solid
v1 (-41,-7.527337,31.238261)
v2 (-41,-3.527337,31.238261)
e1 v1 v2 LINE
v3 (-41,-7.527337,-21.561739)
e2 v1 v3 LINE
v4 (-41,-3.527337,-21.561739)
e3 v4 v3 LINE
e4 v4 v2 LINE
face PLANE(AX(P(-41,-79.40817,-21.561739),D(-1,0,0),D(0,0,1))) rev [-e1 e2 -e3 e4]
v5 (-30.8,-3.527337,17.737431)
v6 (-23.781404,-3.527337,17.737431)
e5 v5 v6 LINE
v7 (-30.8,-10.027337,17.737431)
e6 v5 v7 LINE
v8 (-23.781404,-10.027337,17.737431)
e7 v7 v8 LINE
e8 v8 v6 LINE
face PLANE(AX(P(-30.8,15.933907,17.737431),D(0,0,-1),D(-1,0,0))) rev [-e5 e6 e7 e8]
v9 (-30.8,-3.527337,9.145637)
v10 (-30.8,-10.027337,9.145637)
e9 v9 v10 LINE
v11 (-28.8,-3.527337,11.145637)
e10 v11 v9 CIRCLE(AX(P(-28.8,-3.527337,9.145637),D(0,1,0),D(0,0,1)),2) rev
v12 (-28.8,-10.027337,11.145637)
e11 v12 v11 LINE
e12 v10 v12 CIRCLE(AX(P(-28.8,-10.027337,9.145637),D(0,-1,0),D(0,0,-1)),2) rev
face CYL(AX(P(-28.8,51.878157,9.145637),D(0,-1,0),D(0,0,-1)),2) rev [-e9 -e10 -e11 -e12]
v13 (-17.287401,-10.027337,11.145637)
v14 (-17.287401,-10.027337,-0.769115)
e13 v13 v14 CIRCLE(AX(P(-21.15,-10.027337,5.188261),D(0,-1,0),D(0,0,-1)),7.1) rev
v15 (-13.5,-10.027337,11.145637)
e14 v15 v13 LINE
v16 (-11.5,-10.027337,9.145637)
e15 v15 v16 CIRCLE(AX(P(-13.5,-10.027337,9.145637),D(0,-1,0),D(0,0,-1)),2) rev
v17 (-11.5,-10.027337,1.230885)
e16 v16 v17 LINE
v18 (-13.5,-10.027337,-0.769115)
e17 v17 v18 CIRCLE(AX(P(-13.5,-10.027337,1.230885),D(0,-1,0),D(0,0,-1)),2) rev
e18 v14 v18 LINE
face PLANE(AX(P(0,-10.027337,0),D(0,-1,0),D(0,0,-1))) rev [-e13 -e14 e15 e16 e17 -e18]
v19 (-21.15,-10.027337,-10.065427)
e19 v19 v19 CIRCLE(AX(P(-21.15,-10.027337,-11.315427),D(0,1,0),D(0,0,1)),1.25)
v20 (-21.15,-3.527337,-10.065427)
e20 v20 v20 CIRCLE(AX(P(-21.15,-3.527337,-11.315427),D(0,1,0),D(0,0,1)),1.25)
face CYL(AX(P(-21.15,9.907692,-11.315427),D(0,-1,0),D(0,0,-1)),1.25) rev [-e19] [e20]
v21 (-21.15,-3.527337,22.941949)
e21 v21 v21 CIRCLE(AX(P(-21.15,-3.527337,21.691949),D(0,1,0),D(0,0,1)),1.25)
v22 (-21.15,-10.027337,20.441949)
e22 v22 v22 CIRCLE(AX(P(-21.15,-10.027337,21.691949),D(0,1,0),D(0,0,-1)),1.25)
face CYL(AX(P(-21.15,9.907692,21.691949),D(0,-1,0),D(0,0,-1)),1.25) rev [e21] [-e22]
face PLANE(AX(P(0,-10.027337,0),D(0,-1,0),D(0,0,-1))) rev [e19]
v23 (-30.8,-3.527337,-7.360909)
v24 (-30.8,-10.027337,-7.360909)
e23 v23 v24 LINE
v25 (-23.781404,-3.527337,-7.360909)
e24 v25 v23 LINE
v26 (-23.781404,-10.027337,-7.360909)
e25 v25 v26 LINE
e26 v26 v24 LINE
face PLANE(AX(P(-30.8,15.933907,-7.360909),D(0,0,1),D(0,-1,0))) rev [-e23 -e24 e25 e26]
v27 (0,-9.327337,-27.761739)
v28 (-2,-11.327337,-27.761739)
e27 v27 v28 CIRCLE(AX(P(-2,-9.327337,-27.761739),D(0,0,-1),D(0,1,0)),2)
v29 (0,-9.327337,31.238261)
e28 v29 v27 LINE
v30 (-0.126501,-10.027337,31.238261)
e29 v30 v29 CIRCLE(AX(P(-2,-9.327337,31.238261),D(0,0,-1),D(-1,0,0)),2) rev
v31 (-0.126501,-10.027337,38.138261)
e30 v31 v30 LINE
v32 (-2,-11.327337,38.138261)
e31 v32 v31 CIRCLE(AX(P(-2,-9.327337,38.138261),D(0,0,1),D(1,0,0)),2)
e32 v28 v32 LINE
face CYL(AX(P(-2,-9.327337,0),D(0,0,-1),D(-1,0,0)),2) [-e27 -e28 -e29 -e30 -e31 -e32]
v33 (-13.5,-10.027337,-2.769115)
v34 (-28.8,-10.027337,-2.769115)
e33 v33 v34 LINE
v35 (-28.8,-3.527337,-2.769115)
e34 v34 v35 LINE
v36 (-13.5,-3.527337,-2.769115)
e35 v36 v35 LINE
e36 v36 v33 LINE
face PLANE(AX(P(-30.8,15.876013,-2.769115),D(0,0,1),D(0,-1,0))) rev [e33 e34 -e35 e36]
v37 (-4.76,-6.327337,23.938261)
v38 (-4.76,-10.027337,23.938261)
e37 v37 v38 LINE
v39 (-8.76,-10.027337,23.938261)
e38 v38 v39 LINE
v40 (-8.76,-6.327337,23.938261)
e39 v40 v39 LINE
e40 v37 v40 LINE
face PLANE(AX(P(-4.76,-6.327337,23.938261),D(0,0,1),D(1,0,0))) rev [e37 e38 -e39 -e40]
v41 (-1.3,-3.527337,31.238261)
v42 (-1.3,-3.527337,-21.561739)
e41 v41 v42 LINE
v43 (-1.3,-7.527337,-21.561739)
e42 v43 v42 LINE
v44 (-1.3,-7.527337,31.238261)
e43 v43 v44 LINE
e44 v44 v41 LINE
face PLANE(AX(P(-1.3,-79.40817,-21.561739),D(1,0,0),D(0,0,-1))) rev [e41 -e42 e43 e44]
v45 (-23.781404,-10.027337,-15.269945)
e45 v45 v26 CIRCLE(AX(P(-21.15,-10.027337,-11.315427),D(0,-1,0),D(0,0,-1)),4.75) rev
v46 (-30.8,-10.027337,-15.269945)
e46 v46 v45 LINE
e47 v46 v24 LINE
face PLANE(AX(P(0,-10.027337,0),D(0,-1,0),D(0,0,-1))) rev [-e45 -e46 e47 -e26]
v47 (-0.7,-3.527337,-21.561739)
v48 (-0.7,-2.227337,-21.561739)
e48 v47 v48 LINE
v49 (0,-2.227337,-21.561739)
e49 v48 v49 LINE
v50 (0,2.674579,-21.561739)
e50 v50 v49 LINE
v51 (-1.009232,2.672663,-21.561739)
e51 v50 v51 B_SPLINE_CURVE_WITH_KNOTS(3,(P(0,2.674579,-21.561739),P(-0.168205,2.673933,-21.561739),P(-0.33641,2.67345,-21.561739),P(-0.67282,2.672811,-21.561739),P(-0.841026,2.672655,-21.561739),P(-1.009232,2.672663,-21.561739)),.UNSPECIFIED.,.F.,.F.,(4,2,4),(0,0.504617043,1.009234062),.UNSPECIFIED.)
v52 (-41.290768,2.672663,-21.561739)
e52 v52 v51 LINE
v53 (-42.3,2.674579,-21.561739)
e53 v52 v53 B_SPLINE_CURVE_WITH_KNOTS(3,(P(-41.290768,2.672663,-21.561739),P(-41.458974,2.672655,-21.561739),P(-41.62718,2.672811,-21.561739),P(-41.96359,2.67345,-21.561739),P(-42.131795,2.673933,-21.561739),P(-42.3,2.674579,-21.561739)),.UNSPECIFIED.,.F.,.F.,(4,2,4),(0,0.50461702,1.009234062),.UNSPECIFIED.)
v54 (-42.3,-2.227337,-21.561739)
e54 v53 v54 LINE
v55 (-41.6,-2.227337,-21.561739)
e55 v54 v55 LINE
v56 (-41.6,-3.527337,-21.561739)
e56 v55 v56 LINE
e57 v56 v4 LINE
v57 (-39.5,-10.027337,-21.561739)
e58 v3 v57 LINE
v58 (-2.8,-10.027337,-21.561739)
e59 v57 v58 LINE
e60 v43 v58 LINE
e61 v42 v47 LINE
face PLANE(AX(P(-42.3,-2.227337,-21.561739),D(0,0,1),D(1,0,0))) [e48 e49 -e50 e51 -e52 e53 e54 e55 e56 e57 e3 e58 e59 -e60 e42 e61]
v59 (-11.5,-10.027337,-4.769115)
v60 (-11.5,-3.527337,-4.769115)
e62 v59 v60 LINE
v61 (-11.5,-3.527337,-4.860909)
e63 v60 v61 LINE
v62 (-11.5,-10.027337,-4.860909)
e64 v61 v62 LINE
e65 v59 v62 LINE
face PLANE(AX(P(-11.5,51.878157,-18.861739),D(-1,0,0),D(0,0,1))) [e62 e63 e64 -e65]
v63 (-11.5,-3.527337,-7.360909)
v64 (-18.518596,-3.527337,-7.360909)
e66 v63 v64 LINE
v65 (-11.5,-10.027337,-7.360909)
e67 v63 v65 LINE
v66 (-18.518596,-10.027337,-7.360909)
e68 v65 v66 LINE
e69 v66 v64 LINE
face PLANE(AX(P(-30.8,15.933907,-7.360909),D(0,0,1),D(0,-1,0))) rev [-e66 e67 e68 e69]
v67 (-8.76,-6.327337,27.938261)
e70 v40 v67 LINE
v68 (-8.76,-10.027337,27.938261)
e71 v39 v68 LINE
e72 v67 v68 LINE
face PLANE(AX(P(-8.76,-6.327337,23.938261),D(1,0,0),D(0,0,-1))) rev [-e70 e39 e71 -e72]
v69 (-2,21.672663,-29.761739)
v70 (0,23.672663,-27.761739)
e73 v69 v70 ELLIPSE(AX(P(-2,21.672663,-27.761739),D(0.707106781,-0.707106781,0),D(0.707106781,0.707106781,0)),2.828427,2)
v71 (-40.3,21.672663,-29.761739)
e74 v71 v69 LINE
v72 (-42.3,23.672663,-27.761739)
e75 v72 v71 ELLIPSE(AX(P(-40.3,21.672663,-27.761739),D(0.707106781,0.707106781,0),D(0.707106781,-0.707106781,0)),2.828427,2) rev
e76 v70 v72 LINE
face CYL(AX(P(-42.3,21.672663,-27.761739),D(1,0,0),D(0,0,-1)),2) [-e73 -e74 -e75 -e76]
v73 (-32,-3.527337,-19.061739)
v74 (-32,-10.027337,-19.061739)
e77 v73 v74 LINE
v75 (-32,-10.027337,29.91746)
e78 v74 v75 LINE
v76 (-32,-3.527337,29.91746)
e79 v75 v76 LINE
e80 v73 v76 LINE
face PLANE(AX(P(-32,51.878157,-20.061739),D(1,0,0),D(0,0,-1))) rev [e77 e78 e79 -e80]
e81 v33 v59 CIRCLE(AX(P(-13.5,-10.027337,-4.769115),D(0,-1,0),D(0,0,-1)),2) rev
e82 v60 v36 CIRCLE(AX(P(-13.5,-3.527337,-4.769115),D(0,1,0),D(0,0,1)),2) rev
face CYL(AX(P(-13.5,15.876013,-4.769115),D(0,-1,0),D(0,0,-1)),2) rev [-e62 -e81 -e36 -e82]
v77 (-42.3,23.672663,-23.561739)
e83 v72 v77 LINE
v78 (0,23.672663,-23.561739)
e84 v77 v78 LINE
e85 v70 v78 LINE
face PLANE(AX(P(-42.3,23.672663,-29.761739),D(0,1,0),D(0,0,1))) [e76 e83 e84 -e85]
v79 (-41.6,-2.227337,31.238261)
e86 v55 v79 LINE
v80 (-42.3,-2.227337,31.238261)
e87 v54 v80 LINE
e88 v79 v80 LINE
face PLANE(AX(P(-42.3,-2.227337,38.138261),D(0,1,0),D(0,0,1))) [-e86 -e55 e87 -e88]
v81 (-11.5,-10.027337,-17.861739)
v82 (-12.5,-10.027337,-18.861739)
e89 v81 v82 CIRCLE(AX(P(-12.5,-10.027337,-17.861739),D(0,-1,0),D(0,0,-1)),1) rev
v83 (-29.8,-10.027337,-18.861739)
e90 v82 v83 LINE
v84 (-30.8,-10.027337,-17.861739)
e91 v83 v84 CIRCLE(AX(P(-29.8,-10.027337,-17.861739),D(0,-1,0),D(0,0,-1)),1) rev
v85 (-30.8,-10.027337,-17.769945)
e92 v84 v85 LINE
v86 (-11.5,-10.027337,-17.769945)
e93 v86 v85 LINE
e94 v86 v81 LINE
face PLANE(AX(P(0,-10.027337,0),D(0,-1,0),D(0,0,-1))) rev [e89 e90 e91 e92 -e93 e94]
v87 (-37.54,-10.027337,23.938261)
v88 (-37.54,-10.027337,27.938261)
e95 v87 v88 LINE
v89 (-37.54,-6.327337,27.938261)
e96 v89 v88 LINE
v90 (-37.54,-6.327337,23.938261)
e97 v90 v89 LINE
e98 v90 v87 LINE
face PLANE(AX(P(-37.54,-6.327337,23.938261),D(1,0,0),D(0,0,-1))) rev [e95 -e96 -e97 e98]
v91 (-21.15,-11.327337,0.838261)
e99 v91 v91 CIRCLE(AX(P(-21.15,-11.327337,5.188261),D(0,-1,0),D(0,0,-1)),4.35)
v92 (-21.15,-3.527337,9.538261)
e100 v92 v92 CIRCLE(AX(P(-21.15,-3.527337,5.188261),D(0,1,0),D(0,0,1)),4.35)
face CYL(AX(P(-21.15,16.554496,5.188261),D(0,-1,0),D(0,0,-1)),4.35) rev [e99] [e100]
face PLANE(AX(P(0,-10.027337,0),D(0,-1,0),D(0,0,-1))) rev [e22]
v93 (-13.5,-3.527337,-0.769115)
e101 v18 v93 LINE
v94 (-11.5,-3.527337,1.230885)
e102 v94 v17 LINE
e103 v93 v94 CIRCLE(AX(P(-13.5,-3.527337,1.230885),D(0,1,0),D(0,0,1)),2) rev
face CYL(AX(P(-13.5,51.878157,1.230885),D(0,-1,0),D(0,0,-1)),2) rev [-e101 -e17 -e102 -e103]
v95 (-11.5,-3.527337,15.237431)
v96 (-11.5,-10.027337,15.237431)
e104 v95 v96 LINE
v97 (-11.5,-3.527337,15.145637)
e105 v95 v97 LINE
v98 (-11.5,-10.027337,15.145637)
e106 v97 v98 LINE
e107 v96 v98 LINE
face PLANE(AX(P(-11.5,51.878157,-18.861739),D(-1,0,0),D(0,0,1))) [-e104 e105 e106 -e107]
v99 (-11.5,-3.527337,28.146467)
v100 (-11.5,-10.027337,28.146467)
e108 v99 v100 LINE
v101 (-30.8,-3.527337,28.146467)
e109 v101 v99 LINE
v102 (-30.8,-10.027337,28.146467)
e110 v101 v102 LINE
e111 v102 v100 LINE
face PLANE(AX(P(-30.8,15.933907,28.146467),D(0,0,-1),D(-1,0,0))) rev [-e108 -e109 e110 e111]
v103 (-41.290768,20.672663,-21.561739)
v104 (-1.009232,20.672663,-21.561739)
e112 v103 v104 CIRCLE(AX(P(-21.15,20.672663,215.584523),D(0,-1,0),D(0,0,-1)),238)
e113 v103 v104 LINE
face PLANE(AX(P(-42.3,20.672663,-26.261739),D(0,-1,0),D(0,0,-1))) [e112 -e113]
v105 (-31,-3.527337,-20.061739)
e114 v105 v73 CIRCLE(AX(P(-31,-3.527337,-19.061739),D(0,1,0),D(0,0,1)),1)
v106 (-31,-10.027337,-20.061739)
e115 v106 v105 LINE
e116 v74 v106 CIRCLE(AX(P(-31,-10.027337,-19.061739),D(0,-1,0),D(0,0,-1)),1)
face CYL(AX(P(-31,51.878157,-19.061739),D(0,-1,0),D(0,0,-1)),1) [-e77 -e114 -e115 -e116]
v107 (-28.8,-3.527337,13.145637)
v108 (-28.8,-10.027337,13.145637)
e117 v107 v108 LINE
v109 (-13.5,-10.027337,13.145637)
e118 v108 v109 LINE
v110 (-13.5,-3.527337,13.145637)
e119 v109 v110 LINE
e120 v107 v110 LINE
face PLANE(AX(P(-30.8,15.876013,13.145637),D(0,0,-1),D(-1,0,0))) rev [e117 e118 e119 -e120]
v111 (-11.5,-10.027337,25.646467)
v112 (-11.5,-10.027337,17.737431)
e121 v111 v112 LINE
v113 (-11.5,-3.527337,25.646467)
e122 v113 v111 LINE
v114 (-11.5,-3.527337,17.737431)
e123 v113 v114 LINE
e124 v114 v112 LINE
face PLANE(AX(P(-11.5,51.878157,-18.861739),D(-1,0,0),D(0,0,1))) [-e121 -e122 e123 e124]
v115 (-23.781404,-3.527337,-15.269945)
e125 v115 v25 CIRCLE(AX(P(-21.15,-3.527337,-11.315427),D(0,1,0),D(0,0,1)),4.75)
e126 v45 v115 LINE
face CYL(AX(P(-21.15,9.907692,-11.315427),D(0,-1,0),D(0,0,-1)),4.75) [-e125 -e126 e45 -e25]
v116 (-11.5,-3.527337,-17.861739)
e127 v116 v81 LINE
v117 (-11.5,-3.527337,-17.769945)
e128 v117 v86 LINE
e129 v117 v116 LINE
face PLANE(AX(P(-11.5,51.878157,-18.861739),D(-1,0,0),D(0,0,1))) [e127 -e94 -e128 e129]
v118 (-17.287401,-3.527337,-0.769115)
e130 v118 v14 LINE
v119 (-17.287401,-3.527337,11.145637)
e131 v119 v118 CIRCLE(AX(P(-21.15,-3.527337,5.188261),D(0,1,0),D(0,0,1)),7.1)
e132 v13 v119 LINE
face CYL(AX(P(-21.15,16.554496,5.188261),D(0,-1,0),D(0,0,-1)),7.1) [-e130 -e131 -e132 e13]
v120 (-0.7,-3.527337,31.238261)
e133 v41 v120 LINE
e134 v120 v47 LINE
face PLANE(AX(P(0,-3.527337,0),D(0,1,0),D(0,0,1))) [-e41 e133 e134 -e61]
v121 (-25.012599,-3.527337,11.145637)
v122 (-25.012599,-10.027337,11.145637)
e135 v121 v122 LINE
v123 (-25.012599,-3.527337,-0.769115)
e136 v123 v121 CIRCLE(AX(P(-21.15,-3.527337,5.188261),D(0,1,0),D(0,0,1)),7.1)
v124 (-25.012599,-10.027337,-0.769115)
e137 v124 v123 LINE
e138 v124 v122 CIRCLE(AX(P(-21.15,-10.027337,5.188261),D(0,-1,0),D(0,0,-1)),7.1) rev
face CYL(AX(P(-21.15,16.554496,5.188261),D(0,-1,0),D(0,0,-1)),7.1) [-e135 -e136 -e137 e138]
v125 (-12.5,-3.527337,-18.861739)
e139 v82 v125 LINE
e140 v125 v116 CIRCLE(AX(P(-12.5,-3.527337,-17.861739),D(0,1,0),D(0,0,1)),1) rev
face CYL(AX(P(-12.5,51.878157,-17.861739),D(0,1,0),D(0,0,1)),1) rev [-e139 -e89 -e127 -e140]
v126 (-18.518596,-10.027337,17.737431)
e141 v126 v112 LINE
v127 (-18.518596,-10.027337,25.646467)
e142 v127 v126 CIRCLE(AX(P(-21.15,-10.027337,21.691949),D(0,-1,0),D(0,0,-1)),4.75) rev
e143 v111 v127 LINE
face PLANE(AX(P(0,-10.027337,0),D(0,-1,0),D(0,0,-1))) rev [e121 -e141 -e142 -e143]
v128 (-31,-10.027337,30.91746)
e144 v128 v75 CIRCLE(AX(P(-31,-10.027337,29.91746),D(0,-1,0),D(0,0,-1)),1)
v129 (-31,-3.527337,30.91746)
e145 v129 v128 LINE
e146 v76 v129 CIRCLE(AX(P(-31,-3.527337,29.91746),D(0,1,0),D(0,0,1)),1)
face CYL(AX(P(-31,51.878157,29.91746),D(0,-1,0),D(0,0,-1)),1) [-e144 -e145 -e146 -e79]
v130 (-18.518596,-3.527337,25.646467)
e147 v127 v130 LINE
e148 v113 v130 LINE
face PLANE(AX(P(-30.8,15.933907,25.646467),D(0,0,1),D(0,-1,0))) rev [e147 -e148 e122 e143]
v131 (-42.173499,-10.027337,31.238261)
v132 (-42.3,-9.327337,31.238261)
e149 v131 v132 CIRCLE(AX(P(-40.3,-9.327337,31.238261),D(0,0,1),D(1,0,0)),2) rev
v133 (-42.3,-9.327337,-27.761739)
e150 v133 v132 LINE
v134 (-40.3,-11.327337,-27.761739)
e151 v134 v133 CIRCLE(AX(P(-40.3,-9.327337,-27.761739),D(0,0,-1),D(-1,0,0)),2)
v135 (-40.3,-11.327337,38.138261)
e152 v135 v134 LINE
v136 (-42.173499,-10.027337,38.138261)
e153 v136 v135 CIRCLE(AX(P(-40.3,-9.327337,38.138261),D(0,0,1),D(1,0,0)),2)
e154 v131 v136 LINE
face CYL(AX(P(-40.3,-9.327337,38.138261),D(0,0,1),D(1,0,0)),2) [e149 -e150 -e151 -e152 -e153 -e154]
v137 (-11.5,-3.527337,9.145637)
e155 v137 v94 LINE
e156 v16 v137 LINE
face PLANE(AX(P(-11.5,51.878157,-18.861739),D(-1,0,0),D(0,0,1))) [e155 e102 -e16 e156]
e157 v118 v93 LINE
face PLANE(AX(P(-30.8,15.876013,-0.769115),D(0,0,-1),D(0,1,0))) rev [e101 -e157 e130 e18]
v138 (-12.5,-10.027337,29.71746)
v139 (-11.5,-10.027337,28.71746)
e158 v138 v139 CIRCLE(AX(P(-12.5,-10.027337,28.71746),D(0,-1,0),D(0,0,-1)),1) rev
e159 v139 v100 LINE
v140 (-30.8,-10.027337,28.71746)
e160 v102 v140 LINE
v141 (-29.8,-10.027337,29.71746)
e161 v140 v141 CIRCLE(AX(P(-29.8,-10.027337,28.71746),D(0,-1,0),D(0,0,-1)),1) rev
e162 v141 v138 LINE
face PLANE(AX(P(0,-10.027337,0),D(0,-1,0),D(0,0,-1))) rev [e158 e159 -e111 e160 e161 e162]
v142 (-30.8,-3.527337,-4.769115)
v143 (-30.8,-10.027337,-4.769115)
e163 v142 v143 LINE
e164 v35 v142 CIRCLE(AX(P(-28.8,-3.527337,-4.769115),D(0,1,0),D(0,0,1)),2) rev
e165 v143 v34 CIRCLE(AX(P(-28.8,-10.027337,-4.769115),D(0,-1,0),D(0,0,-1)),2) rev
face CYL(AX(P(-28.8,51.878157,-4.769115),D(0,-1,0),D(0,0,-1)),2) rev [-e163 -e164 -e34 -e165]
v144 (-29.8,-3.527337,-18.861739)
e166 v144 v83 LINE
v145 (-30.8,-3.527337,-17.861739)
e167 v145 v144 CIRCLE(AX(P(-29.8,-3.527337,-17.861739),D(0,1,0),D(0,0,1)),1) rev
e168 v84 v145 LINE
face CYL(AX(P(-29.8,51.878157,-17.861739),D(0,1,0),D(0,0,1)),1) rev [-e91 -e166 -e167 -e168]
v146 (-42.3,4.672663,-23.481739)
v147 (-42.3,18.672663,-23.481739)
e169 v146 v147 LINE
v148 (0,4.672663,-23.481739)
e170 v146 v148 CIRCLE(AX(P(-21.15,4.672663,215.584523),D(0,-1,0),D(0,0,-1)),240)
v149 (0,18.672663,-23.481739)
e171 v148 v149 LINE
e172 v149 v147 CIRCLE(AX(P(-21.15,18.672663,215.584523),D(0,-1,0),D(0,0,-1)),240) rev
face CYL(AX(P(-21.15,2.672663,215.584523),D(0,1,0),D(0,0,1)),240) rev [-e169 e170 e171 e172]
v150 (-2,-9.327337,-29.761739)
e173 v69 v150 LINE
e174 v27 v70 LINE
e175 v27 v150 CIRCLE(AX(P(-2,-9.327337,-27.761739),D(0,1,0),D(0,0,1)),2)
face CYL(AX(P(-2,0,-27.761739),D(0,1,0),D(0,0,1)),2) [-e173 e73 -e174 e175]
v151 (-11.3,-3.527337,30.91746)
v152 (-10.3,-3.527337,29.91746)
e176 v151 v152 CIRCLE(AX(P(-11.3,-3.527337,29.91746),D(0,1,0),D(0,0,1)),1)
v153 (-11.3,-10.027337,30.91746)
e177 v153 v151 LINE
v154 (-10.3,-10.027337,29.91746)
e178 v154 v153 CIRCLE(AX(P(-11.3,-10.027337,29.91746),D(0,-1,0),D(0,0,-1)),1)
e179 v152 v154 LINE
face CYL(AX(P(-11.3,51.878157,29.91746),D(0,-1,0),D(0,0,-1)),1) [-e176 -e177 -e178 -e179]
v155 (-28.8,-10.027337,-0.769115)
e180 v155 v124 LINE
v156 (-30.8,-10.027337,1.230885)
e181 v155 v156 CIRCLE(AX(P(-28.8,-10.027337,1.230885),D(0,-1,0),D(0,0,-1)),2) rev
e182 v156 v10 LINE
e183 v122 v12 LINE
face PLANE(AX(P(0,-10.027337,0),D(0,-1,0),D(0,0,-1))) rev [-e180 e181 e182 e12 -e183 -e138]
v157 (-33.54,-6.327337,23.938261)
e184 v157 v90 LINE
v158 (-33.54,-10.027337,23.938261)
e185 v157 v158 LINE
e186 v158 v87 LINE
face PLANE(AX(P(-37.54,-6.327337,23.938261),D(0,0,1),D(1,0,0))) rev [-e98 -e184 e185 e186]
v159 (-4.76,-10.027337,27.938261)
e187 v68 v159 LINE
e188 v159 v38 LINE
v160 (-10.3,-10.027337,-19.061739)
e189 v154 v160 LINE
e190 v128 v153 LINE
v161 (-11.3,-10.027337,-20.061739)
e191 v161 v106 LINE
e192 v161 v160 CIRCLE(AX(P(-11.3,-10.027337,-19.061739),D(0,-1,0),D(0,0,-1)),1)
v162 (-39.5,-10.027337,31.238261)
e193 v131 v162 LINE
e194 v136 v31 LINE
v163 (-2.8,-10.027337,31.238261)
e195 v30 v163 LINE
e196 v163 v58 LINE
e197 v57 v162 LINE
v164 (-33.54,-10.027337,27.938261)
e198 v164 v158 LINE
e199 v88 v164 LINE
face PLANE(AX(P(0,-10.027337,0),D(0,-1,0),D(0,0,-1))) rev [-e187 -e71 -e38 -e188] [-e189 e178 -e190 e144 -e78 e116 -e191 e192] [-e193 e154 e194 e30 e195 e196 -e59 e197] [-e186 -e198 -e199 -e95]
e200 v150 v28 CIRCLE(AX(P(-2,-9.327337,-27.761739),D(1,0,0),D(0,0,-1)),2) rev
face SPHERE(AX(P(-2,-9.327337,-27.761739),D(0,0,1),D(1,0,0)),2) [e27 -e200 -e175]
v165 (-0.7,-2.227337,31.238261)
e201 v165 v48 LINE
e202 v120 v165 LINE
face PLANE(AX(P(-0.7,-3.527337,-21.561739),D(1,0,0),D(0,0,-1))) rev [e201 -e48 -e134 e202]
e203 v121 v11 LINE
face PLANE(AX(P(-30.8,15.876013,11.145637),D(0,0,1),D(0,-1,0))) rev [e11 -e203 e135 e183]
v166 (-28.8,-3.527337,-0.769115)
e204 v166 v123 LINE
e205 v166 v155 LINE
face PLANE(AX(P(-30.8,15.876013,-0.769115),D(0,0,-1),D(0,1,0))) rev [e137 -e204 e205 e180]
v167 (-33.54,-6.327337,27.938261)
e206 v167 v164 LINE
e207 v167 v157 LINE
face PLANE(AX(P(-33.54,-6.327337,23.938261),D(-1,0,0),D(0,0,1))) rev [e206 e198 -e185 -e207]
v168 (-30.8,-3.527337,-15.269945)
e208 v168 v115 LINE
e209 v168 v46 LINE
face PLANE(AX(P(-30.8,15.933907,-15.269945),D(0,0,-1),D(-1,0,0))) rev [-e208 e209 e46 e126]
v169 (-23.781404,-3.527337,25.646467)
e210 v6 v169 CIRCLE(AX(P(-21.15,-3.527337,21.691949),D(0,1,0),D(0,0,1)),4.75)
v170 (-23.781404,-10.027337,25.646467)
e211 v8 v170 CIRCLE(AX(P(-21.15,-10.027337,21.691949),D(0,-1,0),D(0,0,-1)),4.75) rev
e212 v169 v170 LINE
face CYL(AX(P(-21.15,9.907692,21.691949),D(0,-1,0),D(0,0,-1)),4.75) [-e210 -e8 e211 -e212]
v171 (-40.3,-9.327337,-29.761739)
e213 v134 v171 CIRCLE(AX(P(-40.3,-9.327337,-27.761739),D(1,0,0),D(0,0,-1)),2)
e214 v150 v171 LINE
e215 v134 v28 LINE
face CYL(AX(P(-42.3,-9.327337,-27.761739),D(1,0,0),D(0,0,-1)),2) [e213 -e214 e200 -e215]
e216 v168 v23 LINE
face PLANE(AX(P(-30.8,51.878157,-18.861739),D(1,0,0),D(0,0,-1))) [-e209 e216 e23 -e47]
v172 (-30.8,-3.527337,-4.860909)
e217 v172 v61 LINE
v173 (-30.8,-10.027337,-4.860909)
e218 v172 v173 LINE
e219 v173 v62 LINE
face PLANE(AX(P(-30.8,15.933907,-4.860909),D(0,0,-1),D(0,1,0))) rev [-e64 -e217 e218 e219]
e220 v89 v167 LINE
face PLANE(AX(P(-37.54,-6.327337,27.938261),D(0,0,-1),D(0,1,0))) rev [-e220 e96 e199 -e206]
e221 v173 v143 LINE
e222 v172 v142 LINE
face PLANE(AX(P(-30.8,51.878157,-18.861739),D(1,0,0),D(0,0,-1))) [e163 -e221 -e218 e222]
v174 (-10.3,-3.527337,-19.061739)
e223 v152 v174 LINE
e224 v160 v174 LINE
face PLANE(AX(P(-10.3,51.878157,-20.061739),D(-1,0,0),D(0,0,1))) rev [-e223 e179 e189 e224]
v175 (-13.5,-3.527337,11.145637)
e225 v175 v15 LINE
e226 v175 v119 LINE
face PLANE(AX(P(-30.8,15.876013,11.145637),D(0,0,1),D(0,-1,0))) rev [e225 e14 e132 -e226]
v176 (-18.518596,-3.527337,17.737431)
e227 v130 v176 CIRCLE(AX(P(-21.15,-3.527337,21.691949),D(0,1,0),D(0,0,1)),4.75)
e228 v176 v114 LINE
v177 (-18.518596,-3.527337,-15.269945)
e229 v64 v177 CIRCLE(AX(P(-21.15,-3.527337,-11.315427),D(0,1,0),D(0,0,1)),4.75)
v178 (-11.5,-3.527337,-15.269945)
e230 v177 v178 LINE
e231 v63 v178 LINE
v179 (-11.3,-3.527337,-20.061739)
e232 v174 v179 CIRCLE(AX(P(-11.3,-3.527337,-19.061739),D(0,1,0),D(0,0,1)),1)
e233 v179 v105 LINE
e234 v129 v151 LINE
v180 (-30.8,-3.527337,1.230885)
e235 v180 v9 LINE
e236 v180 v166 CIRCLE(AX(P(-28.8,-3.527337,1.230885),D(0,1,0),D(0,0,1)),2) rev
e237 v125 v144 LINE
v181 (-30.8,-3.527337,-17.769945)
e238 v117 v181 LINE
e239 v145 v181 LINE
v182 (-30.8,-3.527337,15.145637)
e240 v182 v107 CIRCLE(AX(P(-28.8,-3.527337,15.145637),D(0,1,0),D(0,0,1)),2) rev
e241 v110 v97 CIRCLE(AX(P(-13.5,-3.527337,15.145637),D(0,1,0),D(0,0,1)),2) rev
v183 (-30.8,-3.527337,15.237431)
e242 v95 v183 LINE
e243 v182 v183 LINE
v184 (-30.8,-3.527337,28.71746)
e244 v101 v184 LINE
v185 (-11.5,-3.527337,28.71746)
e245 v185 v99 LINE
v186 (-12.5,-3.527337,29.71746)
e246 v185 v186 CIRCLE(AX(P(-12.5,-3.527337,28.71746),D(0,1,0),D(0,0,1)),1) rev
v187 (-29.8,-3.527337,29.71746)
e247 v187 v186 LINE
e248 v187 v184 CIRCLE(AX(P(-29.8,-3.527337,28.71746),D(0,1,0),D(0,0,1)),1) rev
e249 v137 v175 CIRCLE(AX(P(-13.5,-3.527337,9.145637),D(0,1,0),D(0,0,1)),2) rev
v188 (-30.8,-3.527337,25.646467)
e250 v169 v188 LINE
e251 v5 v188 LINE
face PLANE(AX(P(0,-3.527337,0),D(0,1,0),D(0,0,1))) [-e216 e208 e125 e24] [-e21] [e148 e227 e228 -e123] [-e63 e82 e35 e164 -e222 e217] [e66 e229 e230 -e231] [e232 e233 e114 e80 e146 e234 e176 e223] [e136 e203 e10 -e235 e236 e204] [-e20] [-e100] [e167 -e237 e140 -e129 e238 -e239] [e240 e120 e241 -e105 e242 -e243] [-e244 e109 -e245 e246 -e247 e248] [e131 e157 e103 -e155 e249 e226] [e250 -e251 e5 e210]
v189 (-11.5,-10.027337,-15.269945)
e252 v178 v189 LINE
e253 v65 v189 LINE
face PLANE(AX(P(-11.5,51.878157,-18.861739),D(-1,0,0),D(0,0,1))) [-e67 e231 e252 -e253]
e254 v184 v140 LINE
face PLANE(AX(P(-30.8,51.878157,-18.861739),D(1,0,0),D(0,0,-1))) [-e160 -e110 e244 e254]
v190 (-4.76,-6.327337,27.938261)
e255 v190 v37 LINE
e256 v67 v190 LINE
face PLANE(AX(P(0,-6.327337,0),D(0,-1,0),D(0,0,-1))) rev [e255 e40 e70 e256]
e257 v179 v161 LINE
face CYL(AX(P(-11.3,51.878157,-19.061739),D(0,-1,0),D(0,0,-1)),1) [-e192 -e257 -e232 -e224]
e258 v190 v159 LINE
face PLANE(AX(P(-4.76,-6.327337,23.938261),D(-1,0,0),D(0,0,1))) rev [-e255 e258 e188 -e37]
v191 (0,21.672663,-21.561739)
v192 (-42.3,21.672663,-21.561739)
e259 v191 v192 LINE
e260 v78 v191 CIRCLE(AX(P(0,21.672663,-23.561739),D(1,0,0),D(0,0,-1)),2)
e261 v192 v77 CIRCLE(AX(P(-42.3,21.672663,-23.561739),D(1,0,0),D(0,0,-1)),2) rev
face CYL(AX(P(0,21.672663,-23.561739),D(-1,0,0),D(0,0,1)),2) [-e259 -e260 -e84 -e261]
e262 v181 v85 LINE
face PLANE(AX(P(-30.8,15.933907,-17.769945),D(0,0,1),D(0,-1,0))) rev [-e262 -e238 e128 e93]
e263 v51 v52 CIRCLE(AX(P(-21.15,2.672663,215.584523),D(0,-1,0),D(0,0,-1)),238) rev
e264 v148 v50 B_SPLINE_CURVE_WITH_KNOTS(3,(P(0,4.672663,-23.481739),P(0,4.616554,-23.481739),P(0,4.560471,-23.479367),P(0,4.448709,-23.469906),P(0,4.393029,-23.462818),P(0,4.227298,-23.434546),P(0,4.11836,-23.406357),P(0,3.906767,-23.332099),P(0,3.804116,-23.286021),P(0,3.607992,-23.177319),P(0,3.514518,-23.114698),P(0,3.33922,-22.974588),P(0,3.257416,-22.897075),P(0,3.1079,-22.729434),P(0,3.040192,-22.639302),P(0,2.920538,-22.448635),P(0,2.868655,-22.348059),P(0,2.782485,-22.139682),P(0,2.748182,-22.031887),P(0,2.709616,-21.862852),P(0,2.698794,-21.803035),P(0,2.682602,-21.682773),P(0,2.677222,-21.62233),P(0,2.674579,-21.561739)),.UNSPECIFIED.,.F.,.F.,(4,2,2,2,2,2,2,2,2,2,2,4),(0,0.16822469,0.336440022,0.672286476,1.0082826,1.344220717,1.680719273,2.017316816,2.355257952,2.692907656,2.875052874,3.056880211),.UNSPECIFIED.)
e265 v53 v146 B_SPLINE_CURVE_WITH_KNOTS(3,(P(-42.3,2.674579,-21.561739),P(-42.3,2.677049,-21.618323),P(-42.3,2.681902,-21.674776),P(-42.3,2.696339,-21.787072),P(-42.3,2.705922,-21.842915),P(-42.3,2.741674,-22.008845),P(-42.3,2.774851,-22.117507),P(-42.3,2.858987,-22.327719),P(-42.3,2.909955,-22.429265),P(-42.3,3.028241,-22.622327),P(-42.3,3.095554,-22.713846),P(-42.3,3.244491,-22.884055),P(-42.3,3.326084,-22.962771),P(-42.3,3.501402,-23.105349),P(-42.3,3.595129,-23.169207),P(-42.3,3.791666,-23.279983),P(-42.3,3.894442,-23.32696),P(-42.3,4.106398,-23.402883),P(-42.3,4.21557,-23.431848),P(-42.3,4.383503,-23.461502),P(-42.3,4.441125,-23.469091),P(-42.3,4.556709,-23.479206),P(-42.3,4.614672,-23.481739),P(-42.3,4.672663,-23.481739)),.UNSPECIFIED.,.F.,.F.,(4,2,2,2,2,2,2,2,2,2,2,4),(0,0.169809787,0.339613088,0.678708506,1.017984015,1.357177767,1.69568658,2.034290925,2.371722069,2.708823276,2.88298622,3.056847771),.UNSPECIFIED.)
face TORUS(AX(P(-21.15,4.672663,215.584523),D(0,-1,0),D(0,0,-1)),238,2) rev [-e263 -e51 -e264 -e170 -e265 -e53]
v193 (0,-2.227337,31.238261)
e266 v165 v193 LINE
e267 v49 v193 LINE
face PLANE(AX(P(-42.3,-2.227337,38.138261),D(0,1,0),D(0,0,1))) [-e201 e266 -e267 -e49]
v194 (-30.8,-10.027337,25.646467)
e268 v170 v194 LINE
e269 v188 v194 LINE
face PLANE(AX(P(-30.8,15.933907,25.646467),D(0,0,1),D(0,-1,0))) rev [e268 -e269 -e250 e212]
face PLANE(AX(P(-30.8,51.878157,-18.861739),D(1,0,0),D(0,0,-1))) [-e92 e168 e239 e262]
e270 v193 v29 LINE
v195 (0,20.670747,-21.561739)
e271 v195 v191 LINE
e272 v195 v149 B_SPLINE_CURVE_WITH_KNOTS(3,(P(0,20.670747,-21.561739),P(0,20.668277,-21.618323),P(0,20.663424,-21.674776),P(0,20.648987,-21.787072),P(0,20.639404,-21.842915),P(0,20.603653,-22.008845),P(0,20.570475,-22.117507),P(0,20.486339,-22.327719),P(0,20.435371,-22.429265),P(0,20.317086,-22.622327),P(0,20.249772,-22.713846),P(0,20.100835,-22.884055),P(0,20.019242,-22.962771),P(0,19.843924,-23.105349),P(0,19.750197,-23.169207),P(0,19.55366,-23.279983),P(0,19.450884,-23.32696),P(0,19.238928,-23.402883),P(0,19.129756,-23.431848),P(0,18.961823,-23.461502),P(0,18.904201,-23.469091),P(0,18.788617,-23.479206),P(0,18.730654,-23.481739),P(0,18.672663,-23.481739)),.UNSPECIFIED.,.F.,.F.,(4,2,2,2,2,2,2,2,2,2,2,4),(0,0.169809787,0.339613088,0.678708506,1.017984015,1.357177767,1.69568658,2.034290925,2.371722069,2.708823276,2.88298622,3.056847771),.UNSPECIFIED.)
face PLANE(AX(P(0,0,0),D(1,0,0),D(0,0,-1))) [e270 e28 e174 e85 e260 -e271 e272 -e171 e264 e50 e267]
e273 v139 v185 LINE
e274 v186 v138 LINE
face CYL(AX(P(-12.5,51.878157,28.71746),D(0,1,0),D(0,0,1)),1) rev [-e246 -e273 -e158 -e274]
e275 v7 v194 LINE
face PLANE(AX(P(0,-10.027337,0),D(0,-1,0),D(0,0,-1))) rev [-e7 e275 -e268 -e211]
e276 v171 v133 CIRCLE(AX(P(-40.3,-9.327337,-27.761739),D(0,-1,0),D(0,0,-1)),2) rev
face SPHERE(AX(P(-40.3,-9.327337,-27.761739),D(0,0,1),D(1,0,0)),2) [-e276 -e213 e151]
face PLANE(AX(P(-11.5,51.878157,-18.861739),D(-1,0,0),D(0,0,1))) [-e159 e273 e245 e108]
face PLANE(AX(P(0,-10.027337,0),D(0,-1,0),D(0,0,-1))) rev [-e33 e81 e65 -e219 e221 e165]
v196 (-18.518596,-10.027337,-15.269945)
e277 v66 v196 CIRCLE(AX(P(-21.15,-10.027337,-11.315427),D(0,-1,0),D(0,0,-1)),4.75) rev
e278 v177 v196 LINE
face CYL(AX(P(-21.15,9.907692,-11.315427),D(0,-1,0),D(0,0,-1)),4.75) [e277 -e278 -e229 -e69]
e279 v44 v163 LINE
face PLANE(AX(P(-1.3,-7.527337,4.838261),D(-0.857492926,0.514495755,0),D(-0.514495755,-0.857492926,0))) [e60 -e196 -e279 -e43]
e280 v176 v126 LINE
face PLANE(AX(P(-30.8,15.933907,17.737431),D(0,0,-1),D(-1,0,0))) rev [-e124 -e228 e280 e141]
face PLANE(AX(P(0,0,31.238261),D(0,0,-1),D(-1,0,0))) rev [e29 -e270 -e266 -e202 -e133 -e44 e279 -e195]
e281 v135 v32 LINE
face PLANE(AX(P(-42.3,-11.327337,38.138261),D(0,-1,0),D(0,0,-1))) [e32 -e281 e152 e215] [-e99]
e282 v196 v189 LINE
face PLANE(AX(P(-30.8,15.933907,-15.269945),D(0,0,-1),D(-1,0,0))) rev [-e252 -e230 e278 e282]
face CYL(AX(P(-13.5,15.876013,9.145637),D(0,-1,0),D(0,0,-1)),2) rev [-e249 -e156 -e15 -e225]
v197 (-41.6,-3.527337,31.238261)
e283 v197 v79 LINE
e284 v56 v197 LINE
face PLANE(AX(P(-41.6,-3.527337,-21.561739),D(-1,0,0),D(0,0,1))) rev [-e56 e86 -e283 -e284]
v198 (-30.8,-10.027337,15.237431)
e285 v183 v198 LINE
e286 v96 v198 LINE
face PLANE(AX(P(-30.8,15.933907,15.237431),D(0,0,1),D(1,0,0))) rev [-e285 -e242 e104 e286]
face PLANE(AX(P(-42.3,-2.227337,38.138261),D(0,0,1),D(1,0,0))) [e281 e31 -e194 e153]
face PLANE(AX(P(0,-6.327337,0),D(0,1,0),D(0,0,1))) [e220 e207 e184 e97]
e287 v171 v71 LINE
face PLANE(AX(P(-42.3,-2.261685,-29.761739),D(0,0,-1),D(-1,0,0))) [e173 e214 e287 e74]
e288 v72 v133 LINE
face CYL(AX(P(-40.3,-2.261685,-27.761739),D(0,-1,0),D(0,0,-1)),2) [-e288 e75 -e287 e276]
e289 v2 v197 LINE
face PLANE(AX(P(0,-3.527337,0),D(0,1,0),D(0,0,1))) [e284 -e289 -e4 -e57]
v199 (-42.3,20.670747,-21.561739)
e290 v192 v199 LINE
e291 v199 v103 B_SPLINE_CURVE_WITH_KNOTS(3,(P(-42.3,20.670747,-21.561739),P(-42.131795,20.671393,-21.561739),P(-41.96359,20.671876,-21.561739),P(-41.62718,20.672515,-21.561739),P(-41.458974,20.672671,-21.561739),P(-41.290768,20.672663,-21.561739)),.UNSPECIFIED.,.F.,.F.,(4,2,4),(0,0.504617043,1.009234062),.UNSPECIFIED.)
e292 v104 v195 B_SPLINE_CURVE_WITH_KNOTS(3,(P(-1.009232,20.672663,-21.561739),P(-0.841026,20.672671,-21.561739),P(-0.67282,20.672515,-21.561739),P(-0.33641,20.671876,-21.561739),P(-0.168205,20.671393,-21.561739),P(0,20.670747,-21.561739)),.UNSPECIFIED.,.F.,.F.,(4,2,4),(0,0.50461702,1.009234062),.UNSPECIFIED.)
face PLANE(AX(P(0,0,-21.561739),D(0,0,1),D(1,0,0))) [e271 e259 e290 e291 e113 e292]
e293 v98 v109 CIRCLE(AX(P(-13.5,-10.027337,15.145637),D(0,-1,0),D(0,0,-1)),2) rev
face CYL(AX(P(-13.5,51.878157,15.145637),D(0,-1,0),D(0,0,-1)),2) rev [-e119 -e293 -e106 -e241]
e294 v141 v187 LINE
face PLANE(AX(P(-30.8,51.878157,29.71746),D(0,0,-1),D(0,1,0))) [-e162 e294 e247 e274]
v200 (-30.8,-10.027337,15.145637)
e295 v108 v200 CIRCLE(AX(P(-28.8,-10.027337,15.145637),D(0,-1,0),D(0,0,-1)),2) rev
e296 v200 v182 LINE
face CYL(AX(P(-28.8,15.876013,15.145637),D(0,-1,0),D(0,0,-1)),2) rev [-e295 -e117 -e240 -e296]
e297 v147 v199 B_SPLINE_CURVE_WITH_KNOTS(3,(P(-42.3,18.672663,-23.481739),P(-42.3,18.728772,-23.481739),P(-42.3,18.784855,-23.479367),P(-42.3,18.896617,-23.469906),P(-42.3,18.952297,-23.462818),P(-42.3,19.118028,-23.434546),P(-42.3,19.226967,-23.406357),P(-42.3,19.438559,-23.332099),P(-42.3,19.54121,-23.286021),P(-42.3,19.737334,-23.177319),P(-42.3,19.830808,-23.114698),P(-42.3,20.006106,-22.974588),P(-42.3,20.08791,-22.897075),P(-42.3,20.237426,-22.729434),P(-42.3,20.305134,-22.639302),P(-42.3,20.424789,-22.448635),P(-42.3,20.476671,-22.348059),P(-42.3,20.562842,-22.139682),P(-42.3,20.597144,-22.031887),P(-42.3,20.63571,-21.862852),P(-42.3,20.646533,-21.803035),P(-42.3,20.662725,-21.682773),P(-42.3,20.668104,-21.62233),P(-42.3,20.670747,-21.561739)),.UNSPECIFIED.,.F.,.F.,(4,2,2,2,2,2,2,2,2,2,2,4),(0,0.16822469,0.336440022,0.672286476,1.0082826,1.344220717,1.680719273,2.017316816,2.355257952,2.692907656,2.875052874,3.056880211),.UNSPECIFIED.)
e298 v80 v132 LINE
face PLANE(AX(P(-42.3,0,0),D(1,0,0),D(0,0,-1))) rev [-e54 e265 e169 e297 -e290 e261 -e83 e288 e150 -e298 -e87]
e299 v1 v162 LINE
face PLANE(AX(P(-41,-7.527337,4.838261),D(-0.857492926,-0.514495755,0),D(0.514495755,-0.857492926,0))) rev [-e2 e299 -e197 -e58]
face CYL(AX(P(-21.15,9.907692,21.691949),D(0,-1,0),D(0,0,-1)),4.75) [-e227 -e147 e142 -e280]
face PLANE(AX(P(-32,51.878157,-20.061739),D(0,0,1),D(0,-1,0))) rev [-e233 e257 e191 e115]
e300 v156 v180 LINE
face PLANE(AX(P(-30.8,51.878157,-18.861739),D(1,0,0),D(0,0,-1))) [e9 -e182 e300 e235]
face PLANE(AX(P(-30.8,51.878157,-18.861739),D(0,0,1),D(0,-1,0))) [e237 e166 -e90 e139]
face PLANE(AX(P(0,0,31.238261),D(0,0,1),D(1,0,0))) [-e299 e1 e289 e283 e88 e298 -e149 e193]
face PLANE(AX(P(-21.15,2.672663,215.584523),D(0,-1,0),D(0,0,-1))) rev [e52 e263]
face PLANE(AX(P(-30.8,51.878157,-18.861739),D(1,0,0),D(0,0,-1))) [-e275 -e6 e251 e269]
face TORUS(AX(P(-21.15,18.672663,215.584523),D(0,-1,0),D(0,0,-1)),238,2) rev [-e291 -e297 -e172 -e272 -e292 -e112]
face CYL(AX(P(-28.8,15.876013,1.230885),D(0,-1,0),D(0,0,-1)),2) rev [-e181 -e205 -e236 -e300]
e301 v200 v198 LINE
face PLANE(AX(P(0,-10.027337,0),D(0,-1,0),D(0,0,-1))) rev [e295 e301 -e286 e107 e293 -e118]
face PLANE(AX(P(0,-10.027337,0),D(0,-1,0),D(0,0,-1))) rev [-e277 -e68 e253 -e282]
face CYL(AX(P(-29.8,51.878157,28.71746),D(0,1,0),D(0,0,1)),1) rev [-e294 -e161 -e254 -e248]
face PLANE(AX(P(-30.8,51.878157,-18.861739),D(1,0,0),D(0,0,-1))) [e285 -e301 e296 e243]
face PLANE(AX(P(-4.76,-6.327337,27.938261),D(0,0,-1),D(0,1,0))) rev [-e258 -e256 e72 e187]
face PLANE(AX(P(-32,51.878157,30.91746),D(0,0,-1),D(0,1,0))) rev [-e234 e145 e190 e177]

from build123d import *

# Parameters (mm, degrees)
SALIENTE_EXTRUIR1_DEPTH  = 42.3
CROQUIS3_W               = 40.9
CROQUIS3_H               = 56.9
CORTAR_EXTRUIR1_DEPTH    = 1.3
CROQUIS5_W               = 42.3
CROQUIS5_H               = 2.8
CORTAR_EXTRUIR2_DEPTH    = 7.8
CROQUIS6_W               = 40.9
CROQUIS6_H               = 26.5
CORTAR_EXTRUIR3_DEPTH    = 1.3
CROQUIS8_W               = 39.7
CROQUIS8_H               = 56.9
CORTAR_EXTRUIR4_DEPTH    = 6.5
CROQUIS9_W               = 39.7
CROQUIS9_H               = 32.2
CORTAR_EXTRUIR5_DEPTH    = 7.3
CROQUIS10_W              = 21.7
CROQUIS10_H              = 50.979199381
CROQUIS10_W_2            = 19.3
CROQUIS10_H_2            = 48.579199381
SALIENTE_EXTRUIR2_DEPTH  = 6.5
REDONDEO6_R              = 1
REDONDEO7_R              = 1
CROQUIS17_W              = 39.7
CROQUIS17_H              = 32.2
SALIENTE_EXTRUIR4_DEPTH  = 6
SALIENTE_EXTRUIR5_DEPTH  = 1.3
CORTAR_EXTRUIR6_DEPTH    = 21
REDONDEO8_R              = 2
REDONDEO10_R             = 2
CROQUIS26_R              = 7.1
CROQUIS26_R_2            = 4.35
SALIENTE_EXTRUIR7_DEPTH  = 6.5
CORTAR_EXTRUIR7_START    = -44
CROQUIS27_R              = 4.35
CORTAR_EXTRUIR7_DEPTH    = 44
CROQUIS28_W              = 19.3
CROQUIS28_H              = 2
SALIENTE_EXTRUIR8_DEPTH  = 6.5
REDONDEO11_R             = 2
REDONDEO12_R             = 2
CROQUIS30_R              = 4.75
CROQUIS30_R_2            = 1.25
SALIENTE_EXTRUIR9_DEPTH  = 6.5
CROQUIS33_W              = 19.3
CROQUIS33_H              = 2.5
SALIENTE_EXTRUIR11_DEPTH = 6.5
CORTAR_EXTRUIR8_DEPTH    = 4.1
CROQUIS23_W              = 4
CROQUIS23_H              = 4
SALIENTE_EXTRUIR12_DEPTH = 3.7
NERVIO5_REACH            = 61.555
CROQUIS39_WALL_W         = 124.026264302
CROQUIS39_WALL_H         = 52.8
NERVIO7_REACH            = 61.555
CROQUIS43_WALL_W         = 124.026264302
CROQUIS43_WALL_H         = 52.8
CROQUIS44_W              = 42.3
CROQUIS44_H              = 3
SALIENTE_EXTRUIR13_DEPTH = 4.7
REDONDEO13_R             = 2
REDONDEO14_R             = 2


with BuildPart() as part:
    # Croquis1 → Saliente-Extruir1 (new body)
    with BuildSketch(Plane(origin=(0, 0, 0), x_dir=(0, 0, -1), z_dir=(1, 0, 0))):
        Polygon((-38.13826087, -2.227336957), (21.56173913, -2.227336957), (21.56173913, 23.672663043), (29.76173913, 23.672663043), (29.76173913, -2.261684783), (29.76173913, -11.327336957), (-38.13826087, -11.327336957), align=None)
    extrude(amount=-SALIENTE_EXTRUIR1_DEPTH)

    # Croquis3 → Cortar-Extruir1 (cut)
    with BuildSketch(Plane(origin=(0, -2.227336957, 0), x_dir=(1, 0, 0), z_dir=(0, 1, 0))):
        with Locations((-21.15, -6.88826087)):
            Rectangle(CROQUIS3_W, CROQUIS3_H)
    extrude(amount=-CORTAR_EXTRUIR1_DEPTH, mode=Mode.SUBTRACT)

    # Croquis5 → Cortar-Extruir2 (cut)
    with BuildSketch(Plane(origin=(0, -2.227336957, 0), x_dir=(1, 0, 0), z_dir=(0, 1, 0))):
        with Locations((-21.15, -36.73826087)):
            Rectangle(CROQUIS5_W, CROQUIS5_H)
    extrude(amount=-CORTAR_EXTRUIR2_DEPTH, mode=Mode.SUBTRACT)

    # Croquis6 → Cortar-Extruir3 (cut)
    with BuildSketch(Plane.XY.offset(-21.56173913)):
        with Locations((-21.15, 9.722663043)):
            Rectangle(CROQUIS6_W, CROQUIS6_H)
    extrude(amount=-CORTAR_EXTRUIR3_DEPTH, mode=Mode.SUBTRACT)

    # Croquis8 → Cortar-Extruir4 (cut)
    with BuildSketch(Plane(origin=(0, -3.527336957, 0), x_dir=(1, 0, 0), z_dir=(0, 1, 0))):
        with Locations((-21.15, -6.88826087)):
            Rectangle(CROQUIS8_W, CROQUIS8_H)
    extrude(amount=-CORTAR_EXTRUIR4_DEPTH, mode=Mode.SUBTRACT)

    # Croquis9 → Cortar-Extruir5 (cut)
    with BuildSketch(Plane.XY.offset(-21.56173913)):
        with Locations((-21.15, 6.072663043)):
            Rectangle(CROQUIS9_W, CROQUIS9_H)
    extrude(amount=-CORTAR_EXTRUIR5_DEPTH, mode=Mode.SUBTRACT)

    # Croquis10 → Saliente-Extruir2 (add)
    with BuildSketch(Plane(origin=(0, -10.027336957, 0), x_dir=(1, 0, 0), z_dir=(0, 1, 0))):
        with Locations((-21.15, -5.42786056)):
            Rectangle(CROQUIS10_W, CROQUIS10_H)
        with Locations((-21.15, -5.427860561)):
            Rectangle(CROQUIS10_W_2, CROQUIS10_H_2, mode=Mode.SUBTRACT)
    extrude(amount=SALIENTE_EXTRUIR2_DEPTH)

    # Redondeo6
    redondeo6_edges = [part.edges().sort_by_distance(p)[0] for p in [
        (-30.8, -6.777336957, -18.86173913),
        (-11.5, -6.777336957, -18.86173913),
        (-11.5, -6.777336957, 29.717460251),
        (-30.8, -6.777336957, 29.717460251),
    ]]
    fillet(redondeo6_edges, radius=REDONDEO6_R)

    # Redondeo7
    redondeo7_edges = [part.edges().sort_by_distance(p)[0] for p in [
        (-10.3, -6.777336957, -20.06173913),
        (-10.3, -6.777336957, 30.917460251),
        (-32, -6.777336957, 30.917460251),
        (-32, -6.777336957, -20.06173913),
    ]]
    fillet(redondeo7_edges, radius=REDONDEO7_R)

    # Croquis17 → Saliente-Extruir4 (add)
    with BuildSketch(Plane.XY.offset(-28.86173913)):
        with Locations((-21.15, 6.072663043)):
            Rectangle(CROQUIS17_W, CROQUIS17_H)
    extrude(amount=SALIENTE_EXTRUIR4_DEPTH)

    # Croquis18 → Saliente-Extruir5 (add)
    with BuildSketch(Plane.XY.offset(-22.86173913)):
        Polygon((-41.6, 22.972663043), (-41.6, -3.527336957), (-41, -3.527336957), (-41, -10.027336957), (-1.3, -10.027336957), (-1.3, -3.527336957), (-0.7, -3.527336957), (-0.7, 22.972663043), align=None)
    extrude(amount=SALIENTE_EXTRUIR5_DEPTH)

    # Croquis19 → Cortar-Extruir6 (cut)
    with BuildSketch(Plane(origin=(0, 23.672663043, 0), x_dir=(1, 0, 0), z_dir=(0, 1, 0))):
        with BuildLine():
            Line((-42.3, 23.48173913), (-42.3, 21.56173913))
            Line((-42.3, 21.56173913), (0, 21.56173913))
            Line((0, 21.56173913), (0, 23.48173913))
            ThreePointArc((0, 23.48173913), (-21.15, 24.415477395), (-42.3, 23.48173913))
        make_face()
    extrude(amount=-CORTAR_EXTRUIR6_DEPTH, mode=Mode.SUBTRACT)

    # Redondeo8
    redondeo8_edges = [part.edges().sort_by_distance(p)[0] for p in [
        (-42.3, 6.172663043, -29.76173913),
        (-21.15, 23.672663043, -29.76173913),
        (-21.15, -11.327336957, -29.76173913),
        (0, 6.172663043, -29.76173913),
    ]]
    fillet(redondeo8_edges, radius=REDONDEO8_R)

    # Redondeo10
    # the kernel refuses this fillet: 2 mm, written as the material it takes off along each edge
    with BuildSketch(Plane(origin=(-40.3, -9.327336957, -27.76173913), x_dir=(-1, 0, 0), z_dir=(0, -1, 0))) as redondeo10_piece_1_section:
        Polygon((0, 0), (REDONDEO10_R, 0), (REDONDEO10_R, REDONDEO10_R), (0, REDONDEO10_R), align=None)
    redondeo10_piece_1 = extrude(amount=REDONDEO10_R, mode=Mode.PRIVATE)
    redondeo10_piece_1 = redondeo10_piece_1 - Plane(origin=(-40.3, -9.327336957, -27.76173913), x_dir=(0.7071067811865475, 0, 0.7071067811865475), z_dir=(0, -1, 0)) * Sphere(REDONDEO10_R, mode=Mode.PRIVATE)
    add(redondeo10_piece_1, mode=Mode.SUBTRACT)
    with BuildSketch(Plane(origin=(-2, -9.327336957, -27.76173913), x_dir=(0, -1, 0), z_dir=(1, 0, 0))) as redondeo10_piece_2_section:
        Polygon((0, 0), (REDONDEO10_R, 0), (REDONDEO10_R, REDONDEO10_R), (0, REDONDEO10_R), align=None)
    redondeo10_piece_2 = extrude(amount=REDONDEO10_R, mode=Mode.PRIVATE)
    redondeo10_piece_2 = redondeo10_piece_2 - Plane(origin=(-2, -9.327336957, -27.76173913), x_dir=(0, 0.7071067811865475, 0.7071067811865475), z_dir=(1, 0, 0)) * Sphere(REDONDEO10_R, mode=Mode.PRIVATE)
    add(redondeo10_piece_2, mode=Mode.SUBTRACT)
    with BuildSketch(Plane(origin=(-42.3, -11.327336957, -27.76173913), x_dir=(1, 0, 0), z_dir=(0, 0, 1)), Plane(origin=(0, -11.327336957, -27.76173913), x_dir=(0, 1, 0), z_dir=(0, 0, 1))) as redondeo10_piece_3:
        with BuildLine():
            CenterArc((REDONDEO10_R, REDONDEO10_R), REDONDEO10_R, 180, 90)
            Line((0, REDONDEO10_R), (0, 0))
            Line((0, 0), (REDONDEO10_R, 0))
        make_face()
    extrude(amount=70.9, mode=Mode.SUBTRACT)

    # Croquis26 → Saliente-Extruir7 (add)
    with BuildSketch(Plane(origin=(0, -10.027336957, 0), x_dir=(1, 0, 0), z_dir=(0, 1, 0))):
        with Locations(Location((-21.15, -5.18826087, 0), (0, 0, 90))):
            Circle(CROQUIS26_R)
        with Locations(Location((-21.15, -5.18826087, 0), (0, 0, 270))):
            Circle(CROQUIS26_R_2, mode=Mode.SUBTRACT)
    extrude(amount=SALIENTE_EXTRUIR7_DEPTH)

    # Croquis27 → Cortar-Extruir7 (cut)
    with BuildSketch(Plane(origin=(0, -10.027336957, 0), x_dir=(1, 0, 0), z_dir=(0, 1, 0)).offset(CORTAR_EXTRUIR7_START)):
        with Locations(Location((-21.15, -5.18826087, 0), (0, 0, 90))):
            Circle(CROQUIS27_R)
    extrude(amount=CORTAR_EXTRUIR7_DEPTH, mode=Mode.SUBTRACT)

    # Croquis28 → Saliente-Extruir8 (add)
    with BuildSketch(Plane(origin=(0, -10.027336957, 0), x_dir=(1, 0, 0), z_dir=(0, 1, 0))):
        with Locations((-21.15, 1.769114844)):
            Rectangle(CROQUIS28_W, CROQUIS28_H)
        with Locations((-21.15, -12.145636583)):
            Rectangle(CROQUIS28_W, CROQUIS28_H)
    extrude(amount=SALIENTE_EXTRUIR8_DEPTH)

    # Redondeo11
    redondeo11_edges = [part.edges().sort_by_distance(p)[0] for p in [
        (-30.8, -6.777336957, -0.769114844),
        (-11.5, -6.777336957, -0.769114844),
        (-11.5, -6.777336957, 11.145636583),
        (-30.8, -6.777336957, 11.145636583),
    ]]
    fillet(redondeo11_edges, radius=REDONDEO11_R)

    # Redondeo12
    redondeo12_edges = [part.edges().sort_by_distance(p)[0] for p in [
        (-30.8, -6.777336957, -2.769114844),
        (-11.5, -6.777336957, -2.769114844),
        (-30.8, -6.777336957, 13.145636583),
        (-11.5, -6.777336957, 13.145636583),
    ]]
    fillet(redondeo12_edges, radius=REDONDEO12_R)

    # Croquis30 → Saliente-Extruir9 (add)
    # profile 1 of 2: a face of its own
    with BuildSketch(Plane(origin=(0, -10.027336957, 0), x_dir=(1, 0, 0), z_dir=(0, 1, 0))):
        with Locations(Location((-21.15, 11.315426987, 0), (0, 0, 90))):
            Circle(CROQUIS30_R)
        with Locations(Location((-21.15, 11.315426987, 0), (0, 0, 270))):
            Circle(CROQUIS30_R_2, mode=Mode.SUBTRACT)
    # profile 2 of 2: a face of its own
    with BuildSketch(Plane(origin=(0, -10.027336957, 0), x_dir=(1, 0, 0), z_dir=(0, 1, 0))):
        with Locations(Location((-21.15, -21.691948726, 0), (0, 0, 90))):
            Circle(CROQUIS30_R)
        with Locations(Location((-21.15, -21.691948726, 0), (0, 0, 90))):
            Circle(CROQUIS30_R_2, mode=Mode.SUBTRACT)
    extrude(amount=SALIENTE_EXTRUIR9_DEPTH)

    # Croquis33 → Saliente-Extruir11 (add)
    with BuildSketch(Plane(origin=(0, -10.027336957, 0), x_dir=(1, 0, 0), z_dir=(0, 1, 0))):
        with Locations((-21.15, 16.519944868)):
            Rectangle(CROQUIS33_W, CROQUIS33_H)
        with Locations((-21.15, 6.110909106)):
            Rectangle(CROQUIS33_W, CROQUIS33_H)
        with Locations((-21.15, -16.487430845)):
            Rectangle(CROQUIS33_W, CROQUIS33_H)
        with Locations((-21.15, -26.896466607)):
            Rectangle(CROQUIS33_W, CROQUIS33_H)
    extrude(amount=SALIENTE_EXTRUIR11_DEPTH)

    # Croquis34 → Cortar-Extruir8 (cut)
    with BuildSketch(Plane.XY.offset(35.33826087)):
        Polygon((-1.3, -10.027336957), (-1.3, -3.527336957), (-0.7, -3.527336957), (-0.7, -2.227336957), (0, -2.227336957), (0, -10.027336957), align=None)
        Polygon((-42.3, -2.227336957), (-42.3, -10.027336957), (-41, -10.027336957), (-41, -3.527336957), (-41.6, -3.527336957), (-41.6, -2.227336957), align=None)
    extrude(amount=-CORTAR_EXTRUIR8_DEPTH, mode=Mode.SUBTRACT)

    # Croquis23 → Saliente-Extruir12 (add)
    with BuildSketch(Plane(origin=(0, -10.027336957, 0), x_dir=(1, 0, 0), z_dir=(0, 1, 0))):
        with Locations((-6.76, -25.93826087)):
            Rectangle(CROQUIS23_W, CROQUIS23_H)
        with Locations((-35.54, -25.93826087)):
            Rectangle(CROQUIS23_W, CROQUIS23_H)
    extrude(amount=SALIENTE_EXTRUIR12_DEPTH)

    # Croquis39 wall → Nervio5 (add, up to next)
    with BuildSketch(Plane(origin=(-40.25, -8.777336957, 4.83826087), x_dir=(0.514495755428, -0.857492925713, 0), z_dir=(0.857492925713, 0.514495755428, 0)), mode=Mode.PRIVATE) as nervio5_sk1:
        Rectangle(CROQUIS39_WALL_W, CROQUIS39_WALL_H)
    nervio5_tool1 = extrude(nervio5_sk1.sketch, amount=-NERVIO5_REACH, mode=Mode.PRIVATE) - part.part
    add(nervio5_tool1.solids().sort_by_distance((-40.25, -8.777336957, 4.83826087))[0])

    # Croquis43 wall → Nervio7 (add, up to next)
    with BuildSketch(Plane(origin=(-2.05, -8.777336957, 4.83826087), x_dir=(-0.514495755428, -0.857492925713, 0), z_dir=(0.857492925713, -0.514495755428, 0)), mode=Mode.PRIVATE) as nervio7_sk1:
        Rectangle(CROQUIS43_WALL_W, CROQUIS43_WALL_H)
    nervio7_tool1 = extrude(nervio7_sk1.sketch, amount=NERVIO7_REACH, mode=Mode.PRIVATE) - part.part
    add(nervio7_tool1.solids().sort_by_distance((-2.05, -8.777336957, 4.83826087))[0])

    # Croquis44 → Saliente-Extruir13 (add)
    with BuildSketch(Plane.XY.offset(-21.56173913)):
        with Locations((-21.15, 22.172663043)):
            Rectangle(CROQUIS44_W, CROQUIS44_H)
    extrude(amount=-SALIENTE_EXTRUIR13_DEPTH)

    # Redondeo13
    redondeo13_edges = [part.edges().sort_by_distance(p)[0] for p in [
        (-21.15, 2.672663043, -24.415477395),
        (-21.15, 20.672663043, -24.415477395),
    ]]
    fillet(redondeo13_edges, radius=REDONDEO13_R)

    # Redondeo14
    redondeo14_edges = [part.edges().sort_by_distance(p)[0] for p in [
        (-21.15, 23.672663043, -21.56173913),
    ]]
    fillet(redondeo14_edges, radius=REDONDEO14_R)


solid = part.part
